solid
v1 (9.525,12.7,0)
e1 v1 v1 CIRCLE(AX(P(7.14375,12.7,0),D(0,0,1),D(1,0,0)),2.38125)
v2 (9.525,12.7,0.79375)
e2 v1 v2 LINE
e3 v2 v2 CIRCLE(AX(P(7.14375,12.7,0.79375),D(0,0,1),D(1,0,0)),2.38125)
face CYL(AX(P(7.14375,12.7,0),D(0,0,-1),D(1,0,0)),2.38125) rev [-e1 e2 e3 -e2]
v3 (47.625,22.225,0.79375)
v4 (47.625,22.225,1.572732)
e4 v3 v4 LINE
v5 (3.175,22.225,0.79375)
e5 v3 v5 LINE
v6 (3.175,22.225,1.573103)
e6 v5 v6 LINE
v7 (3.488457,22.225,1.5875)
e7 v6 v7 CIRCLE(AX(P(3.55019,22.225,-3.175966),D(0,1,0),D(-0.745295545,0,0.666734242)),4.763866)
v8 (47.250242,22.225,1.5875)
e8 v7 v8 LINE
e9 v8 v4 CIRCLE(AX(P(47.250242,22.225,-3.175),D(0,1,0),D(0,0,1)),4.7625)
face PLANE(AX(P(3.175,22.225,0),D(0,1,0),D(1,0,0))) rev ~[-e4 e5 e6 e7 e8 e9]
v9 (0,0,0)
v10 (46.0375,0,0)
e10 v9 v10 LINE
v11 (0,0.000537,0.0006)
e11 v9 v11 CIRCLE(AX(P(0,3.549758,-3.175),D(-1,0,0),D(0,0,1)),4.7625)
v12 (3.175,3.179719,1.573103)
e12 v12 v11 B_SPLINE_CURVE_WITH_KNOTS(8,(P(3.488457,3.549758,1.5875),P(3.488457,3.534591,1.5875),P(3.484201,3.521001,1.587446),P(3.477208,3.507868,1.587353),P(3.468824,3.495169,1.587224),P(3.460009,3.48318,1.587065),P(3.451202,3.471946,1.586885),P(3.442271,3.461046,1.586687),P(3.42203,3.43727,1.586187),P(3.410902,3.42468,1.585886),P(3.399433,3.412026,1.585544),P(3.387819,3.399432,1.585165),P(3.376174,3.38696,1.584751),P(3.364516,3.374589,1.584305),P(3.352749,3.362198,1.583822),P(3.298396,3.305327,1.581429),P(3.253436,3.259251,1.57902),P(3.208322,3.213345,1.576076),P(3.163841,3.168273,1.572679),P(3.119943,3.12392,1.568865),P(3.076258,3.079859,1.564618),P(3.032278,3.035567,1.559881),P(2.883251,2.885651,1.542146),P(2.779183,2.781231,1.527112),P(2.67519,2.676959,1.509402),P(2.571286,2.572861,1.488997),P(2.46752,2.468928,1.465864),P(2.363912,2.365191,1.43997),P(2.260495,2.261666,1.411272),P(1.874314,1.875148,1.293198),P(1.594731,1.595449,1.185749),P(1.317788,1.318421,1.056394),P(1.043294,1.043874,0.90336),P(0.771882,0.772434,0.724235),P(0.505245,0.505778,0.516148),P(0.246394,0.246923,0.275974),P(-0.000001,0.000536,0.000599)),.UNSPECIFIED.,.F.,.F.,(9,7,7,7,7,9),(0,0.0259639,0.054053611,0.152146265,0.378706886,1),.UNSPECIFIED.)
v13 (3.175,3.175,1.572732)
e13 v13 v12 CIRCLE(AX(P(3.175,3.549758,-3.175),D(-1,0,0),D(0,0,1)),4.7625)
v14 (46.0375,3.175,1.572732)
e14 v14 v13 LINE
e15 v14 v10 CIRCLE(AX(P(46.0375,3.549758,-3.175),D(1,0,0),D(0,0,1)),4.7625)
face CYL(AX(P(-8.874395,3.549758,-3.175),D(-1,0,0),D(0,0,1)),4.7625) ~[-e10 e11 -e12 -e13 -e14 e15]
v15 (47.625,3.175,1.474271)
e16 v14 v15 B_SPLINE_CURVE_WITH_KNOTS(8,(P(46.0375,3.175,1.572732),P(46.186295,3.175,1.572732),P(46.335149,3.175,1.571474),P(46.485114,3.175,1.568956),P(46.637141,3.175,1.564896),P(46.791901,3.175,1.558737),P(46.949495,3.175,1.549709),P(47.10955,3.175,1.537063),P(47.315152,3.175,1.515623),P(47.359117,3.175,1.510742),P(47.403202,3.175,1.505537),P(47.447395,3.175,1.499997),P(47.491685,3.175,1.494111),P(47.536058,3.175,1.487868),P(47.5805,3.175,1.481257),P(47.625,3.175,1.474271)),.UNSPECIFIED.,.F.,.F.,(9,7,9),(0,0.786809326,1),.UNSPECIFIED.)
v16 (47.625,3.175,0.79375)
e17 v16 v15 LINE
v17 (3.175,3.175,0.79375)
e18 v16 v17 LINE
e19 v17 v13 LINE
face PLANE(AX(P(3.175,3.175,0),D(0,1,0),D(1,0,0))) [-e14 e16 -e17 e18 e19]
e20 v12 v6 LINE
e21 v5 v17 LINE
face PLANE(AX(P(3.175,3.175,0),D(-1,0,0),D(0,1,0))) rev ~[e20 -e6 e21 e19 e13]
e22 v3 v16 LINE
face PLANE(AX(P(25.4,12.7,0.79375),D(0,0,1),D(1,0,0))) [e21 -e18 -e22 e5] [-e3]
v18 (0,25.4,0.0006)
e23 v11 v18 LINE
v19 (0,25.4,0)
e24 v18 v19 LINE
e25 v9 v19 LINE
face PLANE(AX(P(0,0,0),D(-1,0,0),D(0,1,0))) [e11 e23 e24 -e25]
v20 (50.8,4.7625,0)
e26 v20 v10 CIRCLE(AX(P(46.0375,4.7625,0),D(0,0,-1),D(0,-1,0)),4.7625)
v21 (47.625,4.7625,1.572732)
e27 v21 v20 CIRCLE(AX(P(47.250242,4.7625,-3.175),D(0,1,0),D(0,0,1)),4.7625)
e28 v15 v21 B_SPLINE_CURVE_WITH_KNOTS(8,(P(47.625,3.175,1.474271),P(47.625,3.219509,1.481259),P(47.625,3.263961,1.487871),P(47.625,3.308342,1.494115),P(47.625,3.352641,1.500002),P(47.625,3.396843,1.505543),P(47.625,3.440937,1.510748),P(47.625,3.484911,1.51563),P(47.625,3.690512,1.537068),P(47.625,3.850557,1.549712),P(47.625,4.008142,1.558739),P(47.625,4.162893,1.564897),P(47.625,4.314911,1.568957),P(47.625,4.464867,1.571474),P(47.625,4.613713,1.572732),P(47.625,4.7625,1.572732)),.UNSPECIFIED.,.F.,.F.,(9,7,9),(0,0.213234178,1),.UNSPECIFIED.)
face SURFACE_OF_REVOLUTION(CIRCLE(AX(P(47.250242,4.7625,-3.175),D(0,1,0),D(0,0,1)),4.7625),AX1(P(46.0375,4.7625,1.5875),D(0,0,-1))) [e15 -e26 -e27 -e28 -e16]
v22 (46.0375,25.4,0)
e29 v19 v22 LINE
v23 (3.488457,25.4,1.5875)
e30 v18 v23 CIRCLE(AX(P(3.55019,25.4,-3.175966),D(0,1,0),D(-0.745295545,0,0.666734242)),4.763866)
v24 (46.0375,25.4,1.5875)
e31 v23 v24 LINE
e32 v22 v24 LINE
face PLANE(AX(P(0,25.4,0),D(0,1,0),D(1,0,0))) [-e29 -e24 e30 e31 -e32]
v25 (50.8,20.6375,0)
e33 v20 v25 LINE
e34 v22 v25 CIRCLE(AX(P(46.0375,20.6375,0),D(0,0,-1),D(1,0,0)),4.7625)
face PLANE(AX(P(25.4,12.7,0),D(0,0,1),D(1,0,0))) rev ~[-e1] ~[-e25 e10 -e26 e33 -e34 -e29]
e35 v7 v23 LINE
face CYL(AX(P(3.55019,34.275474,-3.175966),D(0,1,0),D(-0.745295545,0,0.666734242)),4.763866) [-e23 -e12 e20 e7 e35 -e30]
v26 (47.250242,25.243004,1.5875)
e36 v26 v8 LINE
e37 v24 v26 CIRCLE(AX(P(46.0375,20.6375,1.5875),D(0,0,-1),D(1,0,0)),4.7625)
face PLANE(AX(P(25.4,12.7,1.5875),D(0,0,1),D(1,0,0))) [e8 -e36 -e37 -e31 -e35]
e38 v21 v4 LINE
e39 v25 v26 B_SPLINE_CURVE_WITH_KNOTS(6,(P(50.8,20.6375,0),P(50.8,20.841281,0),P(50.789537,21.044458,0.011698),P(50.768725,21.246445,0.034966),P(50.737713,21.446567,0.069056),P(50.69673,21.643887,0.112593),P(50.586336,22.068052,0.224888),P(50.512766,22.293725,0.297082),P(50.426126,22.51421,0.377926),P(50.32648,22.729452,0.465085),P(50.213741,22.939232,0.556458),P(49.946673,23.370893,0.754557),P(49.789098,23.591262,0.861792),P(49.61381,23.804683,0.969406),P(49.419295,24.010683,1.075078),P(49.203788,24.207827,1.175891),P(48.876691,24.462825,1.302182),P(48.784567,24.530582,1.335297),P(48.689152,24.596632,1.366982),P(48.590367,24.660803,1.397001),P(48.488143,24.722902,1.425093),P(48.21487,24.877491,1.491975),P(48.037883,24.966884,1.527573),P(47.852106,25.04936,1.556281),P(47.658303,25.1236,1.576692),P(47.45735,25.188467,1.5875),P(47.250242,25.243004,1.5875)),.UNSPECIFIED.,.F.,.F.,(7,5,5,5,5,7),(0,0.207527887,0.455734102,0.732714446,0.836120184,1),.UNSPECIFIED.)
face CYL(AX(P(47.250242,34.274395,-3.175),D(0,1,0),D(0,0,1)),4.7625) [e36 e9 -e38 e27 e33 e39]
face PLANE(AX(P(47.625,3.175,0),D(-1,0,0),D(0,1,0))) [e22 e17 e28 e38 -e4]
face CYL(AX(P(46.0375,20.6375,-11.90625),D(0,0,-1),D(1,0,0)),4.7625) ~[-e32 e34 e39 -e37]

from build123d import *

# Parameters (mm, degrees)
F0_W        = 50.8
F0_H        = 25.4
F0_W_2      = 44.45
F0_H_2      = 19.05
F0_R        = 2.38125
F1_DEPTH    = 0.79375
F2_DEPTH    = 1.5875
F3_R        = 4.7625
F4_T1_DEPTH = 25.4
F4_T3_DEPTH = 54.9118947857
F4_T5_DEPTH = 29.5118947857
F4_T8_ANGLE = 90
F5_T1_DEPTH = 39.6011909767


# Not quite as in the source:
# - a fillet or chamfer that OpenCascade refuses, or shapes differently, is made with other operations: its cross-section is extruded or revolved along the edge and cut away or added


with BuildPart() as f1:
    # F0 (on Top) → F1 (new body)
    with BuildSketch(Plane.XY):
        with Locations((25.4, 12.7)):
            Rectangle(F0_W, F0_H)
        with Locations((25.4, 12.7)):
            Rectangle(F0_W_2, F0_H_2, mode=Mode.SUBTRACT)
        with Locations((25.4, 12.7)):
            Rectangle(F0_W_2, F0_H_2)
        with Locations((7.14375, 12.7)):
            Circle(F0_R, mode=Mode.SUBTRACT)
    extrude(amount=F1_DEPTH)

    # F0 (on Top) → F2 (join)
    with BuildSketch(Plane.XY):
        with Locations((25.4, 12.7)):
            Rectangle(F0_W, F0_H)
        with Locations((25.4, 12.7)):
            Rectangle(F0_W_2, F0_H_2, mode=Mode.SUBTRACT)
    extrude(amount=F2_DEPTH)

    # F3
    f3_edges = [f1.edges().sort_by_distance(p)[0] for p in [
        (50.8, 0, 0.79375),
    ]]
    fillet(f3_edges, radius=F3_R)

    # F4: fillet of radius 4.7625 on 2 edges, made by hand

    # F4_s2 → F4_t1 (cut)
    with BuildSketch(Plane.XY.offset(-11.90625)):
        with BuildLine():
            ThreePointArc((50.8, 20.6375), (49.4050960454, 24.0050960454), (46.0375, 25.4))
            Line((46.0375, 25.4), (50.8, 25.4))
            Line((50.8, 25.4), (50.8, 20.6375))
        make_face()
    extrude(amount=F4_T1_DEPTH, mode=Mode.SUBTRACT)

    # F4_s4 → F4_t3 (cut)
    with BuildSketch(Plane.YZ.offset(-8.8743947857)):
        with BuildLine():
            ThreePointArc((3.5497579143, 1.5875), (1.6054754309, 1.1725478002), (0, 0))
            Line((0, 0), (0, 1.5875))
            Line((0, 1.5875), (3.5497579143, 1.5875))
        make_face()
    extrude(amount=F4_T3_DEPTH, mode=Mode.SUBTRACT)

    # F4_s6 → F4_t5 (cut)
    with BuildSketch(Plane.XZ.offset(-34.2743947857)):
        with BuildLine():
            ThreePointArc((47.2502420857, 1.5875), (49.1945245691, 1.1725478002), (50.8, 0))
            Line((50.8, 0), (50.8, 1.5875))
            Line((50.8, 1.5875), (47.2502420857, 1.5875))
        make_face()
    extrude(amount=F4_T5_DEPTH, mode=Mode.SUBTRACT)

    # F4_s7 → F4_t8 (revolve, cut)
    with BuildSketch(Plane.XZ.offset(-4.7625)):
        with BuildLine():
            ThreePointArc((47.2502420857, 1.5875), (49.1945245691, 1.1725478002), (50.8, 0))
            Line((50.8, 0), (50.8, 1.5875))
            Line((50.8, 1.5875), (47.2502420857, 1.5875))
        make_face()
    revolve(axis=Axis((46.0375, 4.7625, 1.5875), (0, 0, -1)), revolution_arc=F4_T8_ANGLE, mode=Mode.SUBTRACT)

    # F5: fillet of radius 4.7625 on 1 edges, made by hand

    # F5_s2 → F5_t1 (cut)
    with BuildSketch(Plane.XZ.offset(-34.2754744455)):
        with BuildLine():
            ThreePointArc((-0.0002981182, 0.0002666937), (1.6055468798, 1.1729169704), (3.5501897557, 1.5879))
            Line((3.5501897557, 1.5879), (3.5501897557, 2.0642865685))
            ThreePointArc((3.5501897557, 2.0642865685), (1.7750948778, 2.0638865685), (0, 2.0638865685))
            Line((0, 2.0638865685), (-0.4763865685, 1.5875))
            ThreePointArc((-0.4763865685, 1.5875), (-0.4763865685, 0.7938833468), (-0.3553469056, 0.3178899316))
            Line((-0.3553469056, 0.3178899316), (-0.0002981182, 0.0002666937))
        make_face()
    extrude(amount=F5_T1_DEPTH, mode=Mode.SUBTRACT)


solid = f1.part
